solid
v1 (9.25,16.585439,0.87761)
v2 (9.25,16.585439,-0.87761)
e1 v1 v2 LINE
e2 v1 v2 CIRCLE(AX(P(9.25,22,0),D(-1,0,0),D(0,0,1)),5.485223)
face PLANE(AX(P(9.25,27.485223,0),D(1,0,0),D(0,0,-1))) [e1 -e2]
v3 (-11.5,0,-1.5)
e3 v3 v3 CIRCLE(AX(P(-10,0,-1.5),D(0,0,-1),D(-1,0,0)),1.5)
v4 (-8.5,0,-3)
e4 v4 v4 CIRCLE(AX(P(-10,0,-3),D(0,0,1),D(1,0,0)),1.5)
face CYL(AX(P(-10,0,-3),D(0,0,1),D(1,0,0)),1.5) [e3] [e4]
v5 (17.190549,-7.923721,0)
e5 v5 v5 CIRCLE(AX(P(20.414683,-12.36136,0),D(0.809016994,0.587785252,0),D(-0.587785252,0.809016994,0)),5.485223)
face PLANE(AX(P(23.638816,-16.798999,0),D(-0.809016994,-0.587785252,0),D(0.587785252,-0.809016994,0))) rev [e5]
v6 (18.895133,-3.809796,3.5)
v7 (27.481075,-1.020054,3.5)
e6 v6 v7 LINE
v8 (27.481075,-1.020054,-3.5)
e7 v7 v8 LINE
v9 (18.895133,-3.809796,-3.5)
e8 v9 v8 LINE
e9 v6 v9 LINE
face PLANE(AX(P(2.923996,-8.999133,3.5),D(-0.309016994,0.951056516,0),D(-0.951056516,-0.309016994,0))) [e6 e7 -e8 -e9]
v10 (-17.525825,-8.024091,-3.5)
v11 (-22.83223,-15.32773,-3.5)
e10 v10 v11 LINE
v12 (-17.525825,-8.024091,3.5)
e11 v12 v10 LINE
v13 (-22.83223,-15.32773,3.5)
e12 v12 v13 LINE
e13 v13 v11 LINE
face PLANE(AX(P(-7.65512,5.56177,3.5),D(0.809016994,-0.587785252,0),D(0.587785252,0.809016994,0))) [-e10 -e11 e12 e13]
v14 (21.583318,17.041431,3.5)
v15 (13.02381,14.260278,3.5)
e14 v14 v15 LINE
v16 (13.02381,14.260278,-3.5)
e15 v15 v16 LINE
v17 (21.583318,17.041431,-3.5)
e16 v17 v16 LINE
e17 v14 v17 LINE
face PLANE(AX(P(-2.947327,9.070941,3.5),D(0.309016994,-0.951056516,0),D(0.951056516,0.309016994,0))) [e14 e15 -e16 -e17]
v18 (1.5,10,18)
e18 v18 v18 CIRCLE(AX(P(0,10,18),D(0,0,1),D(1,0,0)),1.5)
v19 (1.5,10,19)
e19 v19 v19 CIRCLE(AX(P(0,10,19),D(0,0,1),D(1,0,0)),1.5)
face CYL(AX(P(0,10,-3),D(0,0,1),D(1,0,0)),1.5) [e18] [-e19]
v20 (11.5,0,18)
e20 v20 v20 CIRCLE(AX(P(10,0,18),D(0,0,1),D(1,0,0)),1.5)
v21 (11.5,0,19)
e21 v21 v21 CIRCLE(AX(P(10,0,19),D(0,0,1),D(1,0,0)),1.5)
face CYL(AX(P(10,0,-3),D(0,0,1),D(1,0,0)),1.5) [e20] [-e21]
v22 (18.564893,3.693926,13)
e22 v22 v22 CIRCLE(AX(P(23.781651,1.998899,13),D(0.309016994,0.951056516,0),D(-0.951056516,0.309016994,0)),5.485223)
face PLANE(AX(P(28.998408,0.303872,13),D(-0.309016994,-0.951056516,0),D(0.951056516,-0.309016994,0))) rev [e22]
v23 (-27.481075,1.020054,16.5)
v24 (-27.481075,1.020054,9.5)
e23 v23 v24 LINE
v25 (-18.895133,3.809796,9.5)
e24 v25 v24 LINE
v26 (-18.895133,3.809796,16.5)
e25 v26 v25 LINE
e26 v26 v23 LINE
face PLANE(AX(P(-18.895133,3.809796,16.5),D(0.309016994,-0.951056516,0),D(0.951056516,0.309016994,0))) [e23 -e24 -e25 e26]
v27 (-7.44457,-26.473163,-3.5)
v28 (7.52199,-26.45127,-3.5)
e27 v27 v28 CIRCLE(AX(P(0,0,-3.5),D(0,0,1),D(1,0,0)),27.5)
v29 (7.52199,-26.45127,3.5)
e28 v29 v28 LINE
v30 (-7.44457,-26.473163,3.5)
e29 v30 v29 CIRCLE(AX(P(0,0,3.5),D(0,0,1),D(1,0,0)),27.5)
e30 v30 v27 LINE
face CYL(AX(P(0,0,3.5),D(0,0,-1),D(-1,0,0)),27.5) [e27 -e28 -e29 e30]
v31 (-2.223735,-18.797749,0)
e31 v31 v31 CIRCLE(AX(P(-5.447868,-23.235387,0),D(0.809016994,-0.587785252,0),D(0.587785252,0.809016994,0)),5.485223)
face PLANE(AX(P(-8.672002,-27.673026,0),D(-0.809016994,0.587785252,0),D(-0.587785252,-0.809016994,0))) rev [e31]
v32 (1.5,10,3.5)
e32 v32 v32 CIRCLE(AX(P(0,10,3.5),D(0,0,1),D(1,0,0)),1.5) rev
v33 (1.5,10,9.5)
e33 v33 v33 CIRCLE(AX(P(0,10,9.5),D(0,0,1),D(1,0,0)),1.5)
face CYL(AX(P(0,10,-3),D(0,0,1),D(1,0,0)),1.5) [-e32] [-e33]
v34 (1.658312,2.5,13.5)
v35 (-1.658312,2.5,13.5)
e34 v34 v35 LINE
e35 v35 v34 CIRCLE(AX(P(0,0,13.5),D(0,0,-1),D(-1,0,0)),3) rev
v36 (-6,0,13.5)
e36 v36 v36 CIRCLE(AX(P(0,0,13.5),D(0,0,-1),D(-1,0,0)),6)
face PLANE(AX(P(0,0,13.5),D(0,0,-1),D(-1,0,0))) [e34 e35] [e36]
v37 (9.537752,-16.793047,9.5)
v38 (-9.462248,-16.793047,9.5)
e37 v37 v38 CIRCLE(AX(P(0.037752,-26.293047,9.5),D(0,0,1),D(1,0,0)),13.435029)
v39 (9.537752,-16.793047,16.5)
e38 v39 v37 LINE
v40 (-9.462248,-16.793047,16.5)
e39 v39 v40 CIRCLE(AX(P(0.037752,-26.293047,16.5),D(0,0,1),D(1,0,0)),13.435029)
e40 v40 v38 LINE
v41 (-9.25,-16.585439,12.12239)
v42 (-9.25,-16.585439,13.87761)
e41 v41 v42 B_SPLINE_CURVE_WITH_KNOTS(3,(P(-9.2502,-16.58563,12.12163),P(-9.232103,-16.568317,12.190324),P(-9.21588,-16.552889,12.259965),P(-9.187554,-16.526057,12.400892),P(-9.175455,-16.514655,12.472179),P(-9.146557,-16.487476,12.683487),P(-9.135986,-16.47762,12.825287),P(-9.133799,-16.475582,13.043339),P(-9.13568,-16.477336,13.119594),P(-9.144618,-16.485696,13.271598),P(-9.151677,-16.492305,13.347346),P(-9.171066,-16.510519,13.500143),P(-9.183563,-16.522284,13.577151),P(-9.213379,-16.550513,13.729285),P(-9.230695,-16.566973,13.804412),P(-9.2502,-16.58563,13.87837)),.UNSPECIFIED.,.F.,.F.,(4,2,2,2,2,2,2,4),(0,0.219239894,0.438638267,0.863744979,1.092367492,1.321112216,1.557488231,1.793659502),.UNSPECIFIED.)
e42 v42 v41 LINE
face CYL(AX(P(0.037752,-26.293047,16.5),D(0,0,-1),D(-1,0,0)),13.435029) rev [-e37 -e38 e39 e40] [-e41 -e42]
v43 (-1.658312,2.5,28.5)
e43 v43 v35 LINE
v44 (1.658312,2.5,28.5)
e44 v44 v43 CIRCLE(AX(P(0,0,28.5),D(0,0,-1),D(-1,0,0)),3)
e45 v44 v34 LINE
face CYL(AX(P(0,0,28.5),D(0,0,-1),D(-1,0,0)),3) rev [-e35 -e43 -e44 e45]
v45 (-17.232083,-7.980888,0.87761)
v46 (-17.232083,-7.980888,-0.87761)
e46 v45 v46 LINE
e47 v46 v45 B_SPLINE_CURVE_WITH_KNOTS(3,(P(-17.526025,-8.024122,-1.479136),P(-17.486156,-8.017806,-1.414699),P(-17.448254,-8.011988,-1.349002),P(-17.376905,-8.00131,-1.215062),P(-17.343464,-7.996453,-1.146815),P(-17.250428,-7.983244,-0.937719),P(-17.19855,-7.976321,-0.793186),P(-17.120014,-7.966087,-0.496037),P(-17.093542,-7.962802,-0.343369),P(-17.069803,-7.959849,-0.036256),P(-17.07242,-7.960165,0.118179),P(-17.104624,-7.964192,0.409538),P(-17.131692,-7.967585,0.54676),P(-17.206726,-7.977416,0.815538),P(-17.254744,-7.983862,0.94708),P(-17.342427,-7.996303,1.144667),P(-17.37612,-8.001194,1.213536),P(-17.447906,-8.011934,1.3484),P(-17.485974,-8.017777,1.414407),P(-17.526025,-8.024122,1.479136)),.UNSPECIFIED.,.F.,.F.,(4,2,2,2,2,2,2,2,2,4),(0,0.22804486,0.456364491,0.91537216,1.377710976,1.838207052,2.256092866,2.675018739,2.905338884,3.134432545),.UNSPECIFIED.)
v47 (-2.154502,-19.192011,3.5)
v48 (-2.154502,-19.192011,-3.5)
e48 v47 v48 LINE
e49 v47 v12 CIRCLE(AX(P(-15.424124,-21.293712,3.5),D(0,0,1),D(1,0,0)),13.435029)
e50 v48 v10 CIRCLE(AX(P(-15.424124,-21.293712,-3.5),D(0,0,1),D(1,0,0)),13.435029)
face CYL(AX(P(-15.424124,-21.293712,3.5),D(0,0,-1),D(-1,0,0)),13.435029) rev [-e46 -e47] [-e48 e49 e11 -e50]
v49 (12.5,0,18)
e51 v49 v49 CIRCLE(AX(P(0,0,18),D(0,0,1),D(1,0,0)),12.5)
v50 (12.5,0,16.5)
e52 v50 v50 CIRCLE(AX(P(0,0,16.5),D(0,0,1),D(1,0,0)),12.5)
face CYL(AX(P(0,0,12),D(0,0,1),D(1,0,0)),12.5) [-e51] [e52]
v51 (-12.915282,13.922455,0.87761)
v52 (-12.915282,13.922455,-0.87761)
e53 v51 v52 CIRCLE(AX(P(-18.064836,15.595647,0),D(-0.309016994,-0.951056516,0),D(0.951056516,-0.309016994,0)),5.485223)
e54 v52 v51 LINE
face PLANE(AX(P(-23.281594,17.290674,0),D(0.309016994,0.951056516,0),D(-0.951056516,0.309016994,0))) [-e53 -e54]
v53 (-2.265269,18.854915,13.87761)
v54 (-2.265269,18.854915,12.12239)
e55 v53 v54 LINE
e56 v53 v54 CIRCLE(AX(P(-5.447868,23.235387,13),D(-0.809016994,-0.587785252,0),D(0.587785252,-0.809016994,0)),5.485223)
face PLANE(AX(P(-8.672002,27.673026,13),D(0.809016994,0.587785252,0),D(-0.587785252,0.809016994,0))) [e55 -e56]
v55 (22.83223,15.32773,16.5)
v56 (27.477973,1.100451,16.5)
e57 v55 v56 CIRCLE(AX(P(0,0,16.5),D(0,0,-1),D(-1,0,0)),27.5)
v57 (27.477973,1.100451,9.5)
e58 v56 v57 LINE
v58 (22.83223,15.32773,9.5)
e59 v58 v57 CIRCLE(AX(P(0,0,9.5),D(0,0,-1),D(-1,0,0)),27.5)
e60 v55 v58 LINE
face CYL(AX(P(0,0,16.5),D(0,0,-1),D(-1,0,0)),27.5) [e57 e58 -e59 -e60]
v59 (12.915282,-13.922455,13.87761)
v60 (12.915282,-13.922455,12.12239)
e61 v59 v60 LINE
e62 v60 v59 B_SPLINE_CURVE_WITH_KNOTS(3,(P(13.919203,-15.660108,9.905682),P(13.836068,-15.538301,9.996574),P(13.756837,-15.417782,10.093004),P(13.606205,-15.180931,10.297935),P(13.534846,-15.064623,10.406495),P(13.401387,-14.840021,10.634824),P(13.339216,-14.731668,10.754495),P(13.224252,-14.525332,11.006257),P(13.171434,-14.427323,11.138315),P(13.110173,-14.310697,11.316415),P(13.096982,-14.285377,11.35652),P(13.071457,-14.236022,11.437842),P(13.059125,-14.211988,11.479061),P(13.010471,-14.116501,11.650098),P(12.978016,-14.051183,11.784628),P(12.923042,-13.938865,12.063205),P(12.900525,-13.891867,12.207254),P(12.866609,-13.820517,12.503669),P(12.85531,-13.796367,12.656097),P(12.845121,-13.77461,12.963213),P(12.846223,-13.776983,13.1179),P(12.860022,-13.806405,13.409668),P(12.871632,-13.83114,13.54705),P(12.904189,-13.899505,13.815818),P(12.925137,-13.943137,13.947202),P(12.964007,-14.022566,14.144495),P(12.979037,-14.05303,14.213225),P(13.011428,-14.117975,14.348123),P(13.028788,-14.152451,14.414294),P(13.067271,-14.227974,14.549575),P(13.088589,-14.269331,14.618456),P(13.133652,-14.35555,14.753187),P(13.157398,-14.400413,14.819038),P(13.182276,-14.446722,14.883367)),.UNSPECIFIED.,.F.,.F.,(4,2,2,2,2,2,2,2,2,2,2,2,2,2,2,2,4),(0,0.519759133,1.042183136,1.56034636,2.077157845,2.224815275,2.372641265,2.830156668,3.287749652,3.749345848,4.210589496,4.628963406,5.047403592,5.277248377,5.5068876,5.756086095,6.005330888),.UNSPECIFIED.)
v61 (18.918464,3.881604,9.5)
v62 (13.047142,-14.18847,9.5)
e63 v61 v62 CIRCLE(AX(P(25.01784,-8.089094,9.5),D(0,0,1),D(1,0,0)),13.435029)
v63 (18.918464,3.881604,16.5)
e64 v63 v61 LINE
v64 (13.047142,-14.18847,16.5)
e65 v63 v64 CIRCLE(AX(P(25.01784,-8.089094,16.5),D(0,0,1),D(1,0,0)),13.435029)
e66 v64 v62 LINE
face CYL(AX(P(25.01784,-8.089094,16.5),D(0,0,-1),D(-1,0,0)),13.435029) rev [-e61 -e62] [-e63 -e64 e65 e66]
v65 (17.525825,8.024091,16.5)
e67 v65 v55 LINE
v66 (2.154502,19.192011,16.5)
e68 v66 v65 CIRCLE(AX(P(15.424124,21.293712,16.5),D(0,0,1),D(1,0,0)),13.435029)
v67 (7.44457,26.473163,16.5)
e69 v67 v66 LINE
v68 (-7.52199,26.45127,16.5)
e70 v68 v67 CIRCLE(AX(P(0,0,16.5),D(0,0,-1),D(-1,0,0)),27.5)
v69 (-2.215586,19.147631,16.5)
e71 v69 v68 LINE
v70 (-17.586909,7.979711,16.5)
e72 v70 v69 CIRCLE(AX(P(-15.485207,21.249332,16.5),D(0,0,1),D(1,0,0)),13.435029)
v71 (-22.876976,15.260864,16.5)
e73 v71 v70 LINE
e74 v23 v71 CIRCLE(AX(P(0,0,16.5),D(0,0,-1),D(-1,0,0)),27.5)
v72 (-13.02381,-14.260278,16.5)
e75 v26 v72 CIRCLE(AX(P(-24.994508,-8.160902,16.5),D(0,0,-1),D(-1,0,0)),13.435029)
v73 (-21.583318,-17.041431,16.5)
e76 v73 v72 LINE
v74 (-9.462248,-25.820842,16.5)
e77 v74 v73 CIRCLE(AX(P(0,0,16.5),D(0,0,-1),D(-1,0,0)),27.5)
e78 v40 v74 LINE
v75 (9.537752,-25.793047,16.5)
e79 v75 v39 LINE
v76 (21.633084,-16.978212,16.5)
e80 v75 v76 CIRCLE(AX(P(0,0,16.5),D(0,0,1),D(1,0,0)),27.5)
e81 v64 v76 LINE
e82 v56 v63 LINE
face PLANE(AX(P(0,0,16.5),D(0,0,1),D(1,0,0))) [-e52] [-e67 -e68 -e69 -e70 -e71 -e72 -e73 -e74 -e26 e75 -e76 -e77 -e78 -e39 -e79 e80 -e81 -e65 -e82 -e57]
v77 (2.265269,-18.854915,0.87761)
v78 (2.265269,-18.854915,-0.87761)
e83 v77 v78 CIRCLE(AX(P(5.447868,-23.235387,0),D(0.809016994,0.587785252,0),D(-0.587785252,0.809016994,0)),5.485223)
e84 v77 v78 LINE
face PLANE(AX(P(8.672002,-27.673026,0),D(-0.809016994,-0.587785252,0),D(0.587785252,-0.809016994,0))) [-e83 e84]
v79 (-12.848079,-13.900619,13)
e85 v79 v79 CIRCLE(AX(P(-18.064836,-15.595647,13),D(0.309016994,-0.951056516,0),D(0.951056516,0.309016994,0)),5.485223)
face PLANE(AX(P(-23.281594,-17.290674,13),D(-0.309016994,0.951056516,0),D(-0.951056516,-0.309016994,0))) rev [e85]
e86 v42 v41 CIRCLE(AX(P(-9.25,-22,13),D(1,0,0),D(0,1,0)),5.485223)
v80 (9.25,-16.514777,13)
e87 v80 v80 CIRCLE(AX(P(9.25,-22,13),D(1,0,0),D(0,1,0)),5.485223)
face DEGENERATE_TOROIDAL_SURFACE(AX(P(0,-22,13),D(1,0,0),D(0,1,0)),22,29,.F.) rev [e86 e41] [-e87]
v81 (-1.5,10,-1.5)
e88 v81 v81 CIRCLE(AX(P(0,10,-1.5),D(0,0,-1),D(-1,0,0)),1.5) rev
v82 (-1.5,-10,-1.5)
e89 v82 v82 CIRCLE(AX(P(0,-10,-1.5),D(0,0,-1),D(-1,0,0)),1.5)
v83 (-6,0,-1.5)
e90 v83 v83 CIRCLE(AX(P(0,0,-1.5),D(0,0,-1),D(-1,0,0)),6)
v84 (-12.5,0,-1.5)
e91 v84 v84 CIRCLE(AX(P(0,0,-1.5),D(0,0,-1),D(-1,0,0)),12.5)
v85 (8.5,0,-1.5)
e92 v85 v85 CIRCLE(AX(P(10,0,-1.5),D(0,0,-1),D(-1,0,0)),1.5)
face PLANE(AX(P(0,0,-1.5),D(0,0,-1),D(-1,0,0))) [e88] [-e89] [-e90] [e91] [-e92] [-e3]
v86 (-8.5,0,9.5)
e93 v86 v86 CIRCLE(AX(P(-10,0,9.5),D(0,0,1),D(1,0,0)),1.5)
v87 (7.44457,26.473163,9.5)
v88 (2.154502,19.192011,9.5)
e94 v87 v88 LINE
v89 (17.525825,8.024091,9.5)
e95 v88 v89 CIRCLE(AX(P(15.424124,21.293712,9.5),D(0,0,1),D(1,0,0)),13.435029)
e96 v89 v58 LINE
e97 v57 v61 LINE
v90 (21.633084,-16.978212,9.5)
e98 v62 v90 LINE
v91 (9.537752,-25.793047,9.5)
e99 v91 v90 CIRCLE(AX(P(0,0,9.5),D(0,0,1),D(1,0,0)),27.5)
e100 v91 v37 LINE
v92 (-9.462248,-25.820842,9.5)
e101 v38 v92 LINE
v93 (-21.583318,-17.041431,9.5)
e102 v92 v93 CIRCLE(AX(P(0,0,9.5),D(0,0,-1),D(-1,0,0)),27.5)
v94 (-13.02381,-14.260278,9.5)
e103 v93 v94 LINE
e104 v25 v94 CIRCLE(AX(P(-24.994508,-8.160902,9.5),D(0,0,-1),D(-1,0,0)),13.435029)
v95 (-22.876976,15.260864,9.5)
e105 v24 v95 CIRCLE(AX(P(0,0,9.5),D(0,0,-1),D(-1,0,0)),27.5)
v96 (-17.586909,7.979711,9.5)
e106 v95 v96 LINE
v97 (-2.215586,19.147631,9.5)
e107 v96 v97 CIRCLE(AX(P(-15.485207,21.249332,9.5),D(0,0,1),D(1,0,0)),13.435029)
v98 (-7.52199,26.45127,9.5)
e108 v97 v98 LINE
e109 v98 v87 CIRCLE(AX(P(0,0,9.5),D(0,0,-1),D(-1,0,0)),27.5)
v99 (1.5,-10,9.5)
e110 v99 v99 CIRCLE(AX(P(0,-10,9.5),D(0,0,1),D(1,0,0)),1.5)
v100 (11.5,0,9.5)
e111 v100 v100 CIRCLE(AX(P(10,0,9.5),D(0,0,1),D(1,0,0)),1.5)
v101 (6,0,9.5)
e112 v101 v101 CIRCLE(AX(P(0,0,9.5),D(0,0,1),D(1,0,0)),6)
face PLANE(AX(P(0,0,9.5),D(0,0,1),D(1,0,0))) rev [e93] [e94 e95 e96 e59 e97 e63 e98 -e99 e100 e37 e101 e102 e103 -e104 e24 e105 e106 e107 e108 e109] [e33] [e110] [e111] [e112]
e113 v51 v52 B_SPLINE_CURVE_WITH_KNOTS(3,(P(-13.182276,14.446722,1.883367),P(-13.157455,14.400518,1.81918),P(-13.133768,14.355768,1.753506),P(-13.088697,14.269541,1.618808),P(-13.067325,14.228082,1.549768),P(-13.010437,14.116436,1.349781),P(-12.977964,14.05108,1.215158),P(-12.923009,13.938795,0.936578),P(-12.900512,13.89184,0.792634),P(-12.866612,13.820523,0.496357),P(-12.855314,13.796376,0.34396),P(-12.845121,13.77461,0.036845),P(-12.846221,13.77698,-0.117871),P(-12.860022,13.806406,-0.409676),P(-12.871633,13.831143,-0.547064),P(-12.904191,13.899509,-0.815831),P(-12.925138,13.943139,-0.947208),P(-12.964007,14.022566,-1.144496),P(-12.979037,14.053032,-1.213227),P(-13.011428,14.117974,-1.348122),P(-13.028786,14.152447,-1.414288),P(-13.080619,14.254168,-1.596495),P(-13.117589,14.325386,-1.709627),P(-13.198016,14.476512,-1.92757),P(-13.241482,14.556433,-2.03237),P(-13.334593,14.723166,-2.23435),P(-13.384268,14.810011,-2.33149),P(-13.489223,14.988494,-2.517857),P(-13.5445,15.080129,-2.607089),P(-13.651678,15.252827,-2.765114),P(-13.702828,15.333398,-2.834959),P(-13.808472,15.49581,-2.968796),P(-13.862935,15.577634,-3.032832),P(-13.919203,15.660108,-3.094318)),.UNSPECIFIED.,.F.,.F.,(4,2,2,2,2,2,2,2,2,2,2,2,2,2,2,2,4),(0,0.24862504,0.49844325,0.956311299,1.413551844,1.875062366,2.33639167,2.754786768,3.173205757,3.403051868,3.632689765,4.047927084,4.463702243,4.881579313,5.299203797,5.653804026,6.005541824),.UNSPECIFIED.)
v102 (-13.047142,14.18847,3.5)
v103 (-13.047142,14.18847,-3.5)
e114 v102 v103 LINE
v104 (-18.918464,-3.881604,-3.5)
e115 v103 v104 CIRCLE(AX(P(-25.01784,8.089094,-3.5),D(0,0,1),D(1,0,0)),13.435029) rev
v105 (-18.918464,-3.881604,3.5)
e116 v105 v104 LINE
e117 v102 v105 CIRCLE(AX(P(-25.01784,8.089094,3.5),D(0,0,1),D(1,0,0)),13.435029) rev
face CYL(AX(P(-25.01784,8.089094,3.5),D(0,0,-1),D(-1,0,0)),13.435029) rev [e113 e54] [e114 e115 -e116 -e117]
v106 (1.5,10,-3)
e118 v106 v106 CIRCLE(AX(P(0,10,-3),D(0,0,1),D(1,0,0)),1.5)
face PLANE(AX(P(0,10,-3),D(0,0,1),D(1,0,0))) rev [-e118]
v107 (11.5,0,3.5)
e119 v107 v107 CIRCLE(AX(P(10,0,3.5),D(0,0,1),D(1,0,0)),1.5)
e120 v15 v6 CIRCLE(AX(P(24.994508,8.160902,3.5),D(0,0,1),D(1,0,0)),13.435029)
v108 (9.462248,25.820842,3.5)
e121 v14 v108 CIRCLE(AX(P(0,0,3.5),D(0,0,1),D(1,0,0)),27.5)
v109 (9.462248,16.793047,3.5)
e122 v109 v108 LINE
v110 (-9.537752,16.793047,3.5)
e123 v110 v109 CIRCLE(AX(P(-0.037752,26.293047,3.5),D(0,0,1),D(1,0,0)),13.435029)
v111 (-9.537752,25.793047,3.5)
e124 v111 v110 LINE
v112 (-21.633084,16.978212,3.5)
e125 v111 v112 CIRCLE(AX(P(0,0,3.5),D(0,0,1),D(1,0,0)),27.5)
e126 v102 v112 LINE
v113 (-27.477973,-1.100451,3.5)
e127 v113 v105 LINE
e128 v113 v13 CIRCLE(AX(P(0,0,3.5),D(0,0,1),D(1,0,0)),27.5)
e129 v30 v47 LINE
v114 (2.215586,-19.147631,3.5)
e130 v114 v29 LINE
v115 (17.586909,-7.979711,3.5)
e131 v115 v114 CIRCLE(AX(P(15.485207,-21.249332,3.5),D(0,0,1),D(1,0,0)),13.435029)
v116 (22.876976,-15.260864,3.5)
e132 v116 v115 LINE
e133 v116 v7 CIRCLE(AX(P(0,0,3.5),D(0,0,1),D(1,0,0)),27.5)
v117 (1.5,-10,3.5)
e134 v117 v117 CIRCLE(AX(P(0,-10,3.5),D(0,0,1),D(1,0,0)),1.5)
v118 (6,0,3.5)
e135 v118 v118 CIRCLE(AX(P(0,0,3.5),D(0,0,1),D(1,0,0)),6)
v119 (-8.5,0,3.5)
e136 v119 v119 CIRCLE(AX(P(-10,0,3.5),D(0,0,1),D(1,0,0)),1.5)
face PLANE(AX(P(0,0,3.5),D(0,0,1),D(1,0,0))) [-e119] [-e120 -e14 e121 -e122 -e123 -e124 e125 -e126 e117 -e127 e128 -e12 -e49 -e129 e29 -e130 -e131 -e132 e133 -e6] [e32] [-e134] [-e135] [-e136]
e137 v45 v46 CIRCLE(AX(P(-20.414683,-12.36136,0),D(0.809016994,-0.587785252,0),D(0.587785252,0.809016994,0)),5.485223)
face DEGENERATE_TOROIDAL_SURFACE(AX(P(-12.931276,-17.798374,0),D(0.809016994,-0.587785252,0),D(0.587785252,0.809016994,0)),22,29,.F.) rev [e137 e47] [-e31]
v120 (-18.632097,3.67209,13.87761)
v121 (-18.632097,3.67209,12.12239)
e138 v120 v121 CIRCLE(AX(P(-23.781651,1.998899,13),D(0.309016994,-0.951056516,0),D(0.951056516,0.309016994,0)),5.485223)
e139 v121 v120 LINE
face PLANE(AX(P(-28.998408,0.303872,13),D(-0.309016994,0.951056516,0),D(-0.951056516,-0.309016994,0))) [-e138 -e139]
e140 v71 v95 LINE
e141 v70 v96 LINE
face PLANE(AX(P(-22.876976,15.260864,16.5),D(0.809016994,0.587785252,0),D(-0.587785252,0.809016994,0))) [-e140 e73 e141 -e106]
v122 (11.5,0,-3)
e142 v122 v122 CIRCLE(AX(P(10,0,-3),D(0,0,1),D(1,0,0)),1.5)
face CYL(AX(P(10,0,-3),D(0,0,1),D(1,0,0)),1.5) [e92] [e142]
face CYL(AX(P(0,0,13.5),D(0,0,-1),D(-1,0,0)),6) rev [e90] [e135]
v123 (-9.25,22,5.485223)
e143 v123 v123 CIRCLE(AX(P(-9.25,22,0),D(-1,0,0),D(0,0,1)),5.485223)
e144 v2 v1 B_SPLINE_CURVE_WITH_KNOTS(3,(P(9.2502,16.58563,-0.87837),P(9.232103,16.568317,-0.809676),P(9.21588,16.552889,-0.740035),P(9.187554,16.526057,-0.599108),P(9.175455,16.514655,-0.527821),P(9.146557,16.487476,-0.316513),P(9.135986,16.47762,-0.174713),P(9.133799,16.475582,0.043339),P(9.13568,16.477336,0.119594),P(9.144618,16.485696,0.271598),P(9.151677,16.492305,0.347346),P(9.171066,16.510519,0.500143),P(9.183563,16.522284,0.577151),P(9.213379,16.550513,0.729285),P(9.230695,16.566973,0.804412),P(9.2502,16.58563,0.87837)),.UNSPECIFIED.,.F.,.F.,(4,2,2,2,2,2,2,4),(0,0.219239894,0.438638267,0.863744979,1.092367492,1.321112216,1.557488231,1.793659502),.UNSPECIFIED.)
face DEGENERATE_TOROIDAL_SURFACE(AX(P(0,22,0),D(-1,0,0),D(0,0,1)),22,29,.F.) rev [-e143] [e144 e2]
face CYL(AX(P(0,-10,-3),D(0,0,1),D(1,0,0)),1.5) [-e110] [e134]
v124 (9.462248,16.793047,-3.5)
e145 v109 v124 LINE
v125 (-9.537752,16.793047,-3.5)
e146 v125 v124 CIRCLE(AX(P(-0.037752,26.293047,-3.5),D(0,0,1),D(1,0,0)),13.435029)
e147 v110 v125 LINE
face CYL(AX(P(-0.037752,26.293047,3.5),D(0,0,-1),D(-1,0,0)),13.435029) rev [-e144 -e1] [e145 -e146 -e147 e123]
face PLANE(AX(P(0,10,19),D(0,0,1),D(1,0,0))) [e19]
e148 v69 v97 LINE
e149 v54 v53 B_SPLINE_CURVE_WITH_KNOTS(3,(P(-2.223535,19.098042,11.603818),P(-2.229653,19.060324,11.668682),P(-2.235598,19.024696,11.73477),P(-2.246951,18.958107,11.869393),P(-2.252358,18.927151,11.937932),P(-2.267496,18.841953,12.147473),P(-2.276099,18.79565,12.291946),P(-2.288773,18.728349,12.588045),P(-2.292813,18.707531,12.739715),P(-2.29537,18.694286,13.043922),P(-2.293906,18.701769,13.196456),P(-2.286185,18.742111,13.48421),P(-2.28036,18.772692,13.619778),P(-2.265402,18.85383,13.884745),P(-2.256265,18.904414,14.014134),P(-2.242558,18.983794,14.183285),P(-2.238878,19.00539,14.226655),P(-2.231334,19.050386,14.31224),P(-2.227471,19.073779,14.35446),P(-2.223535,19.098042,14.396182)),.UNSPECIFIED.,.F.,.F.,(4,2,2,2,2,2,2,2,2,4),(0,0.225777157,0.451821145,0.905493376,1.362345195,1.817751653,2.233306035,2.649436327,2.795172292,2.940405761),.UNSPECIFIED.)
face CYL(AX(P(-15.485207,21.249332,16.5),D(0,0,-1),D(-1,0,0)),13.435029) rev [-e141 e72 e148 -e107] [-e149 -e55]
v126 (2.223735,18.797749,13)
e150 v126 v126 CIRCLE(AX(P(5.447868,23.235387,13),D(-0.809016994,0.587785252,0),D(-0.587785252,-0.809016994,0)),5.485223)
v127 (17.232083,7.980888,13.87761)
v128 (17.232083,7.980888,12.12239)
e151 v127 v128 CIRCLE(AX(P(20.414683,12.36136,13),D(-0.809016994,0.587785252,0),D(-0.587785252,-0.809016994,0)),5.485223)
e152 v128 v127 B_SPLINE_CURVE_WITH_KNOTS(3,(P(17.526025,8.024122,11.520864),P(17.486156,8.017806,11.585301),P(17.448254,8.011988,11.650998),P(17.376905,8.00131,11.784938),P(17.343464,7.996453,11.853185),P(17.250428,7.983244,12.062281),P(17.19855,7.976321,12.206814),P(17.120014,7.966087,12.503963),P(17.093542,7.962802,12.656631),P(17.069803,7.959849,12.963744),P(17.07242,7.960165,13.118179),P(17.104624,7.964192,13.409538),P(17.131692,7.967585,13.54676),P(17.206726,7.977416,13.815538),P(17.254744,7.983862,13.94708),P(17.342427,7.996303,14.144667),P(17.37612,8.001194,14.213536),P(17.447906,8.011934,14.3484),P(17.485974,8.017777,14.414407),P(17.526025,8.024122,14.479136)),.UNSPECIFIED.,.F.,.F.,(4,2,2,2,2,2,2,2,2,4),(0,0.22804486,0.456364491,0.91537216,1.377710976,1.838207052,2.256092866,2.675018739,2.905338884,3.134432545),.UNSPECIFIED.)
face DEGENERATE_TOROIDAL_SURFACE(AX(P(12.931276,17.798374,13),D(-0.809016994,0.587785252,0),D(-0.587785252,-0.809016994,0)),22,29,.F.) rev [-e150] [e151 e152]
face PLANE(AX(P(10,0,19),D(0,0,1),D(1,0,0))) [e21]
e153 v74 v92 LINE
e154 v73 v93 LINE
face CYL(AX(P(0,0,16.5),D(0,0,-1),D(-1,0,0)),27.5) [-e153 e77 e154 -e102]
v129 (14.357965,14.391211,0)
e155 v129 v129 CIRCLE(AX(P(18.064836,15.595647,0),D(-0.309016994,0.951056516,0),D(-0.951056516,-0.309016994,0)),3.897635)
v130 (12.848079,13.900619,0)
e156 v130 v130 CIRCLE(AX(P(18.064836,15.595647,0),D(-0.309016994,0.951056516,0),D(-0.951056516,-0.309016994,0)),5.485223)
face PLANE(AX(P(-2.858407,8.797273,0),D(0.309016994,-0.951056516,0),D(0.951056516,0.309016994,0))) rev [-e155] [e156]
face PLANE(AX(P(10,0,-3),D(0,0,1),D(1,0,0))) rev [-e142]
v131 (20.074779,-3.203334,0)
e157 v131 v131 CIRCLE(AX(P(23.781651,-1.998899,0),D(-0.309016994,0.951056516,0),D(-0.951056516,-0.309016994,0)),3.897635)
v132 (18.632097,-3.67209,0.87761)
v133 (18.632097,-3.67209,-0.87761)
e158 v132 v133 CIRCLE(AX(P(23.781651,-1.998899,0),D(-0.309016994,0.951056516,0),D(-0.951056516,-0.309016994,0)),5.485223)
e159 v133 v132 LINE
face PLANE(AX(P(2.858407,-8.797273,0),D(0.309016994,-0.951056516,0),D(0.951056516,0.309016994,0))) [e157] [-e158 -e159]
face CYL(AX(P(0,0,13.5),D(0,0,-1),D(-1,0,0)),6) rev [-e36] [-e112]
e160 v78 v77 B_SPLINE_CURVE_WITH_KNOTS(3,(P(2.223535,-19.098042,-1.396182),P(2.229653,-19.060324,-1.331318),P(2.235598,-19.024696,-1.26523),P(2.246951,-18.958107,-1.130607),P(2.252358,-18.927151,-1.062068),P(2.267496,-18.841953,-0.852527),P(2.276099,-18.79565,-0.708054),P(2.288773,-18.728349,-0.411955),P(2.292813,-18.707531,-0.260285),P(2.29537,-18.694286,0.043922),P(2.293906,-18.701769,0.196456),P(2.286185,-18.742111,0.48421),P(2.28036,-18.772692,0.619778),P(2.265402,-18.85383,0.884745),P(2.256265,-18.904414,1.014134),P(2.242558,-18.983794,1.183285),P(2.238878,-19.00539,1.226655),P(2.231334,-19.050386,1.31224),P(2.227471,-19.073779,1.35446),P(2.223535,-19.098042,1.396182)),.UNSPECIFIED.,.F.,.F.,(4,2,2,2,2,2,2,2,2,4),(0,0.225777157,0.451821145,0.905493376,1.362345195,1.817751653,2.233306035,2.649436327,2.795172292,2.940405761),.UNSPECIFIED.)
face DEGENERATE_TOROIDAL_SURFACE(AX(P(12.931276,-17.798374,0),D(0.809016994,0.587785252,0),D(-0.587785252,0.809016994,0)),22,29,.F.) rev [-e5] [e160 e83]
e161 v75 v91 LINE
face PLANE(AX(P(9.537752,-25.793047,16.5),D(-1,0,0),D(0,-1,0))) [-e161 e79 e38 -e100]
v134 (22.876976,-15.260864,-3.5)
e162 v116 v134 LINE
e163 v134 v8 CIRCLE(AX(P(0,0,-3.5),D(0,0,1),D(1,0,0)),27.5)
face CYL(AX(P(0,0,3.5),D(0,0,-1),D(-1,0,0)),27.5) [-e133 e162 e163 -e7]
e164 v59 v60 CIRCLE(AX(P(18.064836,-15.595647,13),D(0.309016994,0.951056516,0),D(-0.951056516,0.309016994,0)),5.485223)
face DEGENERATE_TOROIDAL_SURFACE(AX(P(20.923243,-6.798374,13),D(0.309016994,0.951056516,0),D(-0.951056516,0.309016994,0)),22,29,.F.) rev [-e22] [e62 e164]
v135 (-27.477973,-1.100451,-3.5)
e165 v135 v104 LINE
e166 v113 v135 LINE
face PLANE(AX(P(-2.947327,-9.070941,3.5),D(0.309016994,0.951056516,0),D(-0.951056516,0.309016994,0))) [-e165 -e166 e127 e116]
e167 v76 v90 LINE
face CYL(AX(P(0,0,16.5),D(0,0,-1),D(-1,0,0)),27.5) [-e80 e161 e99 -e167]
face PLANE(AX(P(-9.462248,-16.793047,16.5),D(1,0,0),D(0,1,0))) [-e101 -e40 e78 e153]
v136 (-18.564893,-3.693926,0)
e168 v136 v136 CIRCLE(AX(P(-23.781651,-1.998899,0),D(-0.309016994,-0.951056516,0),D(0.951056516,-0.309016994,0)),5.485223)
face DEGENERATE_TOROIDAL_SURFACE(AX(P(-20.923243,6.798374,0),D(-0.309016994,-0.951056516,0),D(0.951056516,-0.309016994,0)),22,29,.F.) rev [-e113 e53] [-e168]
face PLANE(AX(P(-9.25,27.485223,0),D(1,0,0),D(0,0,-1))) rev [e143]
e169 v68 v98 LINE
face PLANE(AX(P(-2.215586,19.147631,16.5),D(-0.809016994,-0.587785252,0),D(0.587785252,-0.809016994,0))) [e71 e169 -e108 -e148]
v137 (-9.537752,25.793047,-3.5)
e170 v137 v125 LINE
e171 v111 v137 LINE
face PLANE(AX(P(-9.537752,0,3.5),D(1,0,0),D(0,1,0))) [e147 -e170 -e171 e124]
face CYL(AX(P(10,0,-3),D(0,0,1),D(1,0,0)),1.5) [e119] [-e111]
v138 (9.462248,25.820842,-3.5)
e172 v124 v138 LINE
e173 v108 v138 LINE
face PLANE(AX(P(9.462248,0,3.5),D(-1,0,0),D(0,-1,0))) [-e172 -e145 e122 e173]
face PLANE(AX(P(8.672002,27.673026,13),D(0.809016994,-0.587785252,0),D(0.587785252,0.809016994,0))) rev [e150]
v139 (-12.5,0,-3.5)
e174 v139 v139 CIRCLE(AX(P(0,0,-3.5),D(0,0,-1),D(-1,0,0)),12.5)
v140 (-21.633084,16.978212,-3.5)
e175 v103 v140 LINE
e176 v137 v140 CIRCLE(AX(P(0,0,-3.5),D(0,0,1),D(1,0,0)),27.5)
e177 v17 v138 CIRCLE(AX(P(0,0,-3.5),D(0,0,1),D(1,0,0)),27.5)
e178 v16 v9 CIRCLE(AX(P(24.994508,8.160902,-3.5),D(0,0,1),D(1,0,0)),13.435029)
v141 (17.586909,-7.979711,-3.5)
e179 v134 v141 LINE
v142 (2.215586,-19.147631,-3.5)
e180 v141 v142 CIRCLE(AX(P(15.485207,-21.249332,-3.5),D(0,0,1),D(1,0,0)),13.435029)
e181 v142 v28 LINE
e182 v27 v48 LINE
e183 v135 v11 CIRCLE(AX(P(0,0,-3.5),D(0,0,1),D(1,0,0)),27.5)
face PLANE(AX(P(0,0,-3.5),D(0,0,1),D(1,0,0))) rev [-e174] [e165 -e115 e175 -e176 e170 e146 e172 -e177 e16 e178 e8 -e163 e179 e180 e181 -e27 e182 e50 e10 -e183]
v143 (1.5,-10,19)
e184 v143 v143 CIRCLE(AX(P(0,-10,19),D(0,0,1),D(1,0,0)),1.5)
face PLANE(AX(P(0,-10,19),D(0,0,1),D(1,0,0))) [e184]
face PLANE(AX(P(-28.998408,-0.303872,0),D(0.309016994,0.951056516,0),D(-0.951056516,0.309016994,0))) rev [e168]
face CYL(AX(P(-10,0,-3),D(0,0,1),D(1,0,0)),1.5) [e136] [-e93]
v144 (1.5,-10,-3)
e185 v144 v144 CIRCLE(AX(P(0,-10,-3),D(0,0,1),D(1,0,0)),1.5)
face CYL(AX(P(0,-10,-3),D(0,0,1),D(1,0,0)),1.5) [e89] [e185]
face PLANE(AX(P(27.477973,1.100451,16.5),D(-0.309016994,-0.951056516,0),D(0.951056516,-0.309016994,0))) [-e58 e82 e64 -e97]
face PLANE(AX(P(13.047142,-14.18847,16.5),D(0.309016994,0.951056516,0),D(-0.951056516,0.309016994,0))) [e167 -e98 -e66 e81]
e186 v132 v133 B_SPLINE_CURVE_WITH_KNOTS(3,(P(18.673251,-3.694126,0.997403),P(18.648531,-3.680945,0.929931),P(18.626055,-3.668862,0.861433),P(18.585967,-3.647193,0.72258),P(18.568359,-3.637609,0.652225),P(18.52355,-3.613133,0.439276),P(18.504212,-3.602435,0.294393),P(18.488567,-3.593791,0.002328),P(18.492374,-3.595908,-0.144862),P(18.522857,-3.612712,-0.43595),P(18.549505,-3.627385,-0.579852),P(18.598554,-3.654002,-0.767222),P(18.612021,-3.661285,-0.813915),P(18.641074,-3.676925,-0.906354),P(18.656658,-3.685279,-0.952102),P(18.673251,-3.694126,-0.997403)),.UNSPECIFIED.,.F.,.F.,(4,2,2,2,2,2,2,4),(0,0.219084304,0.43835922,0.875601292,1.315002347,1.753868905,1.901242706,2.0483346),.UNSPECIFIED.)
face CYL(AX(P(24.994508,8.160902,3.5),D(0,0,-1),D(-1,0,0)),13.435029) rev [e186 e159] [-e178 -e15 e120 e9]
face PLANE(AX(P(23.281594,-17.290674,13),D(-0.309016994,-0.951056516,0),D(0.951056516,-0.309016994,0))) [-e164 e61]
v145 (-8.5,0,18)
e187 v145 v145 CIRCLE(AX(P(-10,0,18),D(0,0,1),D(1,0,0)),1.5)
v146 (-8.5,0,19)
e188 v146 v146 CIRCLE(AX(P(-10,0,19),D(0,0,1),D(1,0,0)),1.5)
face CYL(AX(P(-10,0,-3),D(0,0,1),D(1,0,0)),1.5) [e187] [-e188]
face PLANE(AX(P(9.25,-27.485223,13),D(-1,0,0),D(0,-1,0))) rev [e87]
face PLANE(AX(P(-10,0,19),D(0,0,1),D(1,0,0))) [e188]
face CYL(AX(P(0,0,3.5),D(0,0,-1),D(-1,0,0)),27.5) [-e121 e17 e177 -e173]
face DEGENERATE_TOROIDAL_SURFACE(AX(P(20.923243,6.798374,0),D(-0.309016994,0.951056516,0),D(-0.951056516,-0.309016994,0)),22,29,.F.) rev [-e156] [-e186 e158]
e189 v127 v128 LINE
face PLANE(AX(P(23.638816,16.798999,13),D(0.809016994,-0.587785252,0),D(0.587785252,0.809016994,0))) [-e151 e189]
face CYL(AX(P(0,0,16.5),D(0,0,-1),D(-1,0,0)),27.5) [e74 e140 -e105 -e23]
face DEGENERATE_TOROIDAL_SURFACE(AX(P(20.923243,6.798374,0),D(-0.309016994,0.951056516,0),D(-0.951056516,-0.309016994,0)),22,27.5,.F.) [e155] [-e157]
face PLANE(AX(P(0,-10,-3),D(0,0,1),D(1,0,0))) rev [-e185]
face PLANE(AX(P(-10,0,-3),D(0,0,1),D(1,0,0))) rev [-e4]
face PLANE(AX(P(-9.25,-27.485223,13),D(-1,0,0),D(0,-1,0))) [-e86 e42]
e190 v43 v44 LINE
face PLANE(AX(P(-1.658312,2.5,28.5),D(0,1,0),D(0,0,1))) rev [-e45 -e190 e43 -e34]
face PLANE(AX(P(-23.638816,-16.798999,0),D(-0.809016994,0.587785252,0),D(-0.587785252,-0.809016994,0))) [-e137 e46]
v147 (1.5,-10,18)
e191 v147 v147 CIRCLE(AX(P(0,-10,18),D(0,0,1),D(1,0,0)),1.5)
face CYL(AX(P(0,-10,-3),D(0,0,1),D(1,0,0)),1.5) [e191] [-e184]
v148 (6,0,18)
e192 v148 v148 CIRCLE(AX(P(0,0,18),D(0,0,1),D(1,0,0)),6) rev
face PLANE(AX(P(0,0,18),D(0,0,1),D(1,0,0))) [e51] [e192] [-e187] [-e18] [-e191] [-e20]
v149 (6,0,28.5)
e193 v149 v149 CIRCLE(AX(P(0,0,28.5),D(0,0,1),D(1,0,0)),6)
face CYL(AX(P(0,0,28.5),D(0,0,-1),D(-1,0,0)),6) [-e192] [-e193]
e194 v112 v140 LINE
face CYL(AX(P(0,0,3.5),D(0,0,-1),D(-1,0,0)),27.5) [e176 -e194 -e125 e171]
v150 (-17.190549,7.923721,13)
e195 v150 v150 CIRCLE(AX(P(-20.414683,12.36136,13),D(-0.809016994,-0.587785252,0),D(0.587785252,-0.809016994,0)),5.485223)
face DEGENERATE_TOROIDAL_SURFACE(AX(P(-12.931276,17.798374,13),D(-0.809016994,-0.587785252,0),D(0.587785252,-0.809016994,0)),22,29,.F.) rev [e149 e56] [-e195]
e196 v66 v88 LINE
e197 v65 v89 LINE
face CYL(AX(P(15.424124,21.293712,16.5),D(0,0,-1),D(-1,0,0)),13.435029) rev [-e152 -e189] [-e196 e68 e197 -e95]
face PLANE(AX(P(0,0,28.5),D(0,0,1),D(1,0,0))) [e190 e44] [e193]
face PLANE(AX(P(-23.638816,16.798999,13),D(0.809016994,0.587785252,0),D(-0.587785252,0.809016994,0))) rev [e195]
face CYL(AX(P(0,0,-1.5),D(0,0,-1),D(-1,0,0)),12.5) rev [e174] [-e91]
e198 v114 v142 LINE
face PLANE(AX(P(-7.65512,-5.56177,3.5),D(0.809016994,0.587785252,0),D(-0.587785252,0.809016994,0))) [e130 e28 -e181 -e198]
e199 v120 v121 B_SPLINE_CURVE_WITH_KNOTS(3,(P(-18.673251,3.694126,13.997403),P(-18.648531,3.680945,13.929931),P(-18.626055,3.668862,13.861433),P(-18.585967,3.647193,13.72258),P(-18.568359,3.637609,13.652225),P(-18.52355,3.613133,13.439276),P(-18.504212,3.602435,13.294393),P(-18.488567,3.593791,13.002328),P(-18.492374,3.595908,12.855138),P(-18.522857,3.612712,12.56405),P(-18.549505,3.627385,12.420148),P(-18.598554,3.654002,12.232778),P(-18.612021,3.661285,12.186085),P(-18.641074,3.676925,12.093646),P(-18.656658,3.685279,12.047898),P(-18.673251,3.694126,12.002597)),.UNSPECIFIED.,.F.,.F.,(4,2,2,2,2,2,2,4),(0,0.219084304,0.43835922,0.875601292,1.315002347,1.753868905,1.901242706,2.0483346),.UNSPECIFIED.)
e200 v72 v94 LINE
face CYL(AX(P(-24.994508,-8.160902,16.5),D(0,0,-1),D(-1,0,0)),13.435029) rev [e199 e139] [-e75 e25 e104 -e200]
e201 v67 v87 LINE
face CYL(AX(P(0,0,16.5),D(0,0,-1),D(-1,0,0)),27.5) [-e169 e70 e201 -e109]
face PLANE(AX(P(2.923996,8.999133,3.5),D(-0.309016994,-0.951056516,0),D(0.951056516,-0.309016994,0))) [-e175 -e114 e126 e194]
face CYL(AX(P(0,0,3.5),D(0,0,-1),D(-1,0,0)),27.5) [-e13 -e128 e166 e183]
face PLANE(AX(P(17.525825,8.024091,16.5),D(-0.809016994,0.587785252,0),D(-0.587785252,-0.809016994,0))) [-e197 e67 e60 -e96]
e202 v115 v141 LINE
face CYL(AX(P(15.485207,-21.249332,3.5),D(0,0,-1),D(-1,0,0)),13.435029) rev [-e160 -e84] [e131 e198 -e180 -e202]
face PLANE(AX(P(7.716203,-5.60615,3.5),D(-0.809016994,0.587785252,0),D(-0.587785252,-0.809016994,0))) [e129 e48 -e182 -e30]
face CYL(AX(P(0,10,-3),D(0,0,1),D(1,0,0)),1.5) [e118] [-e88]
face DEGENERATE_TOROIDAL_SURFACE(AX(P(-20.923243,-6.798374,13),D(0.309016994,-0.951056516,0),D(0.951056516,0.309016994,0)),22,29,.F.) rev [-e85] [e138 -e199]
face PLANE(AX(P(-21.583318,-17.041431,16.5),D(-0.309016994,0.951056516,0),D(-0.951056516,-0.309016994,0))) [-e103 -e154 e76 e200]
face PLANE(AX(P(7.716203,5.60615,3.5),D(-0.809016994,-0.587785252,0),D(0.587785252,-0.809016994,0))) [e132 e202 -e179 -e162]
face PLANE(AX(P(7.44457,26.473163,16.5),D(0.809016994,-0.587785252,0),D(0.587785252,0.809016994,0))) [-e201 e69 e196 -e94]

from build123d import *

# Parameters (mm, degrees)
BOSS_EXTRUDE2_DEPTH      = 3.5
BOSS_EXTRUDE5_DEPTH      = 3.5
BOSS_EXTRUDE6_DEPTH      = 5
BOSS_EXTRUDE6_DEPTH_BACK = 1
SKETCH3_30_R             = 12.5
SKETCH6_R                = 12.5
CUT_EXTRUDE3_DEPTH       = 2
BOSS_EXTRUDE9_DEPTH      = 6
BOSS_EXTRUDE9_DEPTH_BACK = 16
SKETCH3_33_R             = 1.5
SKETCH10_R               = 6
BOSS_EXTRUDE10_DEPTH     = 12
CUT_EXTRUDE4_DEPTH       = 51.813384178
CUT_EXTRUDE4_DEPTH_BACK  = 51.813384178
SKETCH11_R               = 6
CUT_EXTRUDE5_DEPTH       = 15


# Read off the part's stored shape, not the designer's step: moBlkMgr[Onmi_58mm_OK]
with BuildPart() as part:
    # Sketch1 → Revolve3 (revolve)
    with BuildSketch(Plane.XY, mode=Mode.PRIVATE) as revolve3_sk:
        with BuildLine():
            Line((27.488521747, -0.794463438), (28.998407922, -0.303871681))
            ThreePointArc((28.998407922, -0.303871681), (27.580638973, 8.961492837), (23.281593526, 17.29067387))
            Line((23.281593526, 17.29067387), (21.771707351, 16.800082113))
            ThreePointArc((21.771707351, 16.800082113), (26.028560776, 8.874909798), (27.5, 0))
            ThreePointArc((27.5, 0), (27.497130287, -0.397273176), (27.488521747, -0.794463438))
        make_face()
    revolve(revolve3_sk.sketch.rotate(Axis((18.064836163, 15.595646653, 0), (0.30901699437493513, -0.9510565162951576, 0)), 180), axis=Axis((18.064836163, 15.595646653, 0), (0.30901699437493513, -0.9510565162951576, 0)))



with BuildPart() as body_2:
    # Sketch1<6> → Revolve4 (revolve)
    with BuildSketch(Plane.XY, mode=Mode.PRIVATE) as revolve4_sk:
        with BuildLine():
            Line((-9.25, 27.485223303), (-9.25, 22.000000003))
            Line((-9.25, 22.000000003), (9.25, 22.000000003))
            Line((9.25, 22.000000003), (9.25, 27.485223303))
            ThreePointArc((9.25, 27.485223303), (0, 29), (-9.25, 27.485223303))
        make_face()
    revolve(revolve4_sk.sketch.rotate(Axis((-9.25, 22.000000003, 0), (1, 0, 0)), 90), axis=Axis((-9.25, 22.000000003, 0), (1, 0, 0)))


with BuildPart() as body_3:
    # Sketch1<7> → Revolve5 (revolve)
    with BuildSketch(Plane.XY, mode=Mode.PRIVATE) as revolve5_sk:
        with BuildLine():
            Line((-23.281593526, 17.29067387), (-18.064836163, 15.595646653))
            Line((-18.064836163, 15.595646653), (-23.781650559, -1.998898899))
            Line((-23.781650559, -1.998898899), (-28.998407922, -0.303871681))
            ThreePointArc((-28.998407922, -0.303871681), (-27.580638973, 8.961492837), (-23.281593526, 17.29067387))
        make_face()
    revolve(revolve5_sk.sketch.rotate(Axis((-23.781650559, -1.998898899, 0), (0.3090169943749596, 0.9510565162951496, 0)), 180), axis=Axis((-23.781650559, -1.998898899, 0), (0.3090169943749596, 0.9510565162951496, 0)))


with BuildPart() as body_4:
    # Sketch1<8> → Revolve6 (revolve)
    with BuildSketch(Plane.XY, mode=Mode.PRIVATE) as revolve6_sk:
        with BuildLine():
            Line((-23.638816111, -16.798999162), (-20.41468275, -12.361360295))
            Line((-20.41468275, -12.361360295), (-5.447868354, -23.235387462))
            Line((-5.447868354, -23.235387462), (-8.672001715, -27.67302633))
            ThreePointArc((-8.672001715, -27.67302633), (-17.045772316, -23.461492837), (-23.638816111, -16.798999162))
        make_face()
    revolve(revolve6_sk.sketch.rotate(Axis((-5.447868354, -23.235387462, 0), (-0.8090169943749399, 0.5877852522924835, 0)), 180), axis=Axis((-5.447868354, -23.235387462, 0), (-0.8090169943749399, 0.5877852522924835, 0)))


with BuildPart() as body_5:
    # Sketch1<9> → Revolve7 (revolve)
    with BuildSketch(Plane.XY, mode=Mode.PRIVATE) as revolve7_sk:
        with BuildLine():
            Line((8.672001715, -27.67302633), (5.447868354, -23.235387462))
            Line((5.447868354, -23.235387462), (20.41468275, -12.361360295))
            Line((20.41468275, -12.361360295), (23.638816111, -16.798999162))
            ThreePointArc((23.638816111, -16.798999162), (17.045772316, -23.461492837), (8.672001715, -27.67302633))
        make_face()
    revolve(revolve7_sk.sketch.rotate(Axis((20.41468275, -12.361360295, 0), (-0.809016994374955, -0.5877852522924628, 0)), 180), axis=Axis((20.41468275, -12.361360295, 0), (-0.809016994374955, -0.5877852522924628, 0)))


with BuildPart() as part_1:
    add(part.part)

    add(body_2.part)  # Boss-Extrude2 merges body 2

    add(body_3.part)  # Boss-Extrude2 merges body 3

    add(body_4.part)  # Boss-Extrude2 merges body 4

    add(body_5.part)  # Boss-Extrude2 merges body 5
    # Sketch1<10> → Boss-Extrude2 (add, symmetric)
    with BuildSketch(Plane.XY):
        with BuildLine():
            ThreePointArc((22.87697608, -15.26086385), (26.166457463, -8.459698804), (27.48107512, -1.020054043))
            Line((27.48107512, -1.020054043), (18.895132644, -3.809795864))
            ThreePointArc((18.895132644, -3.809795864), (12.217036375, 4.009250255), (13.023809751, 14.260277946))
            Line((13.023809751, 14.260277946), (21.583318397, 17.041430895))
            ThreePointArc((21.583318397, 17.041430895), (16.131531712, 22.271589181), (9.46224828, 25.820841533))
            Line((9.46224828, 25.820841533), (9.46224828, 16.79304736))
            ThreePointArc((9.46224828, 16.79304736), (-0.03775172, 12.858018518), (-9.53775172, 16.79304736))
            Line((-9.53775172, 16.79304736), (-9.53775172, 25.79304736))
            ThreePointArc((-9.53775172, 25.79304736), (-16.196622574, 22.224297901), (-21.633084073, 16.978211728))
            Line((-21.633084073, 16.978211728), (-13.047141597, 14.188469907))
            ThreePointArc((-13.047141597, 14.188469907), (-12.240368221, 3.937442217), (-18.91846449, -3.881603902))
            Line((-18.91846449, -3.881603902), (-27.477973137, -1.100450953))
            ThreePointArc((-27.477973137, -1.100450953), (-26.141594966, -8.536217702), (-22.832229519, -15.327729617))
            Line((-22.832229519, -15.327729617), (-17.525825243, -8.024090709))
            ThreePointArc((-17.525825243, -8.024090709), (-7.527211875, -10.424545399), (-2.15450235, -19.192010503))
            Line((-2.15450235, -19.192010503), (-7.44456962, -26.473163452))
            ThreePointArc((-7.44456962, -26.473163452), (0.040228365, -27.499970576), (7.521990192, -26.451269602))
            Line((7.521990192, -26.451269602), (2.215585916, -19.147630694))
            ThreePointArc((2.215585916, -19.147630694), (7.588295441, -10.380165591), (17.586908809, -7.979710901))
            Line((17.586908809, -7.979710901), (22.87697608, -15.26086385))
        make_face()
    extrude(amount=BOSS_EXTRUDE2_DEPTH, both=True)

    # Sketch6 → Cut-Extrude3 (cut)
    with BuildSketch(Plane(origin=(0, 0, -3.5), x_dir=(-1, 0, 0), z_dir=(0, 0, -1))):
        with Locations(Location((0, 0, 0), (0, 0, 180))):
            Circle(SKETCH6_R)
    extrude(amount=-CUT_EXTRUDE3_DEPTH, mode=Mode.SUBTRACT)



with BuildPart() as body_2_2:
    # Sketch3 → Boss-Extrude5 (new, symmetric)
    with BuildSketch(Plane.XY.offset(13)):
        with BuildLine():
            Line((-22.87697608, 15.26086385), (-17.586908809, 7.979710901))
            ThreePointArc((-17.586908809, 7.979710901), (-7.588295441, 10.380165591), (-2.215585916, 19.147630694))
            Line((-2.215585916, 19.147630694), (-7.521990192, 26.451269602))
            ThreePointArc((-7.521990192, 26.451269602), (-0.040228365, 27.499970576), (7.44456962, 26.473163452))
            Line((7.44456962, 26.473163452), (2.15450235, 19.192010503))
            ThreePointArc((2.15450235, 19.192010503), (7.527211875, 10.424545399), (17.525825243, 8.024090709))
            Line((17.525825243, 8.024090709), (22.832229519, 15.327729617))
            ThreePointArc((22.832229519, 15.327729617), (26.141594966, 8.536217702), (27.477973137, 1.100450953))
            Line((27.477973137, 1.100450953), (18.91846449, 3.881603902))
            ThreePointArc((18.91846449, 3.881603902), (12.240368221, -3.937442217), (13.047141597, -14.188469907))
            Line((13.047141597, -14.188469907), (21.633084073, -16.978211728))
            ThreePointArc((21.633084073, -16.978211728), (16.196622574, -22.224297901), (9.53775172, -25.79304736))
            Line((9.53775172, -25.79304736), (9.53775172, -16.79304736))
            ThreePointArc((9.53775172, -16.79304736), (0.03775172, -12.858018518), (-9.46224828, -16.79304736))
            Line((-9.46224828, -16.79304736), (-9.46224828, -25.820841533))
            ThreePointArc((-9.46224828, -25.820841533), (-16.131531712, -22.271589181), (-21.583318397, -17.041430895))
            Line((-21.583318397, -17.041430895), (-13.023809751, -14.260277946))
            ThreePointArc((-13.023809751, -14.260277946), (-12.217036375, -4.009250255), (-18.895132644, 3.809795864))
            Line((-18.895132644, 3.809795864), (-27.48107512, 1.020054043))
            ThreePointArc((-27.48107512, 1.020054043), (-26.166457463, 8.459698804), (-22.87697608, 15.26086385))
        make_face()
    extrude(amount=BOSS_EXTRUDE5_DEPTH, both=True)

    # Sketch3<25> → Revolve14 (revolve)
    with BuildSketch(Plane.XY.offset(13), mode=Mode.PRIVATE) as revolve14_sk:
        with BuildLine():
            Line((23.638816111, 16.798999162), (20.41468275, 12.361360295))
            Line((20.41468275, 12.361360295), (5.447868354, 23.235387462))
            Line((5.447868354, 23.235387462), (8.672001715, 27.67302633))
            ThreePointArc((8.672001715, 27.67302633), (17.045772316, 23.461492837), (23.638816111, 16.798999162))
        make_face()
    revolve(revolve14_sk.sketch.rotate(Axis((5.447868354, 23.235387462, 13), (0.80901699437494, -0.5877852522924834, 0)), 170.793375583), axis=Axis((5.447868354, 23.235387462, 13), (0.80901699437494, -0.5877852522924834, 0)))

    # Sketch3<26> → Revolve15 (revolve)
    with BuildSketch(Plane.XY.offset(13), mode=Mode.PRIVATE) as revolve15_sk:
        with BuildLine():
            Line((23.281593526, -17.29067387), (18.064836163, -15.595646653))
            Line((18.064836163, -15.595646653), (23.781650559, 1.998898899))
            Line((23.781650559, 1.998898899), (28.998407922, 0.303871681))
            ThreePointArc((28.998407922, 0.303871681), (27.580638973, -8.961492837), (23.281593526, -17.29067387))
        make_face()
    revolve(revolve15_sk.sketch.rotate(Axis((23.781650559, 1.998898899, 13), (-0.3090169943749462, -0.951056516295154, 0)), 170.793375583), axis=Axis((23.781650559, 1.998898899, 13), (-0.3090169943749462, -0.951056516295154, 0)))

    # Sketch3<27> → Revolve16 (revolve)
    with BuildSketch(Plane.XY.offset(13), mode=Mode.PRIVATE) as revolve16_sk:
        with BuildLine():
            Line((-23.638816111, 16.798999162), (-20.41468275, 12.361360295))
            Line((-20.41468275, 12.361360295), (-5.447868354, 23.235387462))
            Line((-5.447868354, 23.235387462), (-8.672001715, 27.67302633))
            ThreePointArc((-8.672001715, 27.67302633), (-17.045772316, 23.461492837), (-23.638816111, 16.798999162))
        make_face()
    revolve(revolve16_sk.sketch.rotate(Axis((-20.41468275, 12.361360295, 13), (0.8090169943749468, 0.5877852522924741, 0)), 170.793375583), axis=Axis((-20.41468275, 12.361360295, 13), (0.8090169943749468, 0.5877852522924741, 0)))

    # Sketch3<28> → Revolve17 (revolve)
    with BuildSketch(Plane.XY.offset(13), mode=Mode.PRIVATE) as revolve17_sk:
        with BuildLine():
            Line((-28.998407922, 0.303871681), (-23.781650559, 1.998898899))
            Line((-23.781650559, 1.998898899), (-18.064836163, -15.595646653))
            Line((-18.064836163, -15.595646653), (-23.281593526, -17.29067387))
            ThreePointArc((-23.281593526, -17.29067387), (-27.580638973, -8.961492837), (-28.998407922, 0.303871681))
        make_face()
    revolve(revolve17_sk.sketch.rotate(Axis((-18.064836163, -15.595646653, 13), (-0.3090169943749486, 0.9510565162951532, 0)), 170.793375583), axis=Axis((-18.064836163, -15.595646653, 13), (-0.3090169943749486, 0.9510565162951532, 0)))

    # Sketch3<29> → Revolve18 (revolve)
    with BuildSketch(Plane.XY.offset(13), mode=Mode.PRIVATE) as revolve18_sk:
        with BuildLine():
            Line((-9.25, -27.485223303), (-9.25, -22.000000003))
            Line((-9.25, -22.000000003), (9.25, -22.000000003))
            Line((9.25, -22.000000003), (9.25, -27.485223303))
            ThreePointArc((9.25, -27.485223303), (0, -29), (-9.25, -27.485223303))
        make_face()
    revolve(revolve18_sk.sketch.rotate(Axis((9.25, -22.000000003, 13), (-1, 0, 0)), 189.206624435), axis=Axis((9.25, -22.000000003, 13), (-1, 0, 0)))

    # Sketch3<30> → Boss-Extrude6 (add, two sides: drawn at the far end of the back side and taken through both)
    with BuildSketch(Plane.XY.offset(13).offset(-BOSS_EXTRUDE6_DEPTH_BACK)):
        Circle(SKETCH3_30_R)
    extrude(amount=BOSS_EXTRUDE6_DEPTH + BOSS_EXTRUDE6_DEPTH_BACK)


with BuildPart() as part_2:
    add(part_1.part)

    add(body_2_2.part)  # Boss-Extrude9 merges body 2 2
    # Sketch3<33> → Boss-Extrude9 (add, two sides: drawn at the far end of the back side and taken through both)
    with BuildSketch(Plane.XY.offset(13).offset(-BOSS_EXTRUDE9_DEPTH_BACK)):
        with Locations((0, 10)):
            Circle(SKETCH3_33_R)
        with Locations((10, 0)):
            Circle(SKETCH3_33_R)
        with Locations((0, -10)):
            Circle(SKETCH3_33_R)
        with Locations((-10, 0)):
            Circle(SKETCH3_33_R)
    extrude(amount=BOSS_EXTRUDE9_DEPTH + BOSS_EXTRUDE9_DEPTH_BACK)

    # Sketch10 → Boss-Extrude10 (add)
    with BuildSketch(Plane.XY.offset(16.5)):
        Circle(SKETCH10_R)
    extrude(amount=BOSS_EXTRUDE10_DEPTH)

    # Sketch9 → Cut-Extrude4 (cut, two sides: drawn at the far end of the back side and taken through both)
    with BuildSketch(Plane(origin=(0, 0, -1.5), x_dir=(-1, 0, 0), z_dir=(0, 0, -1)).offset(-CUT_EXTRUDE4_DEPTH_BACK)):
        with BuildLine():
            Line((1.658312395, 2.5), (-1.658312395, 2.5))
            ThreePointArc((-1.658312395, 2.5), (0, -3), (1.658312395, 2.5))
        make_face()
    extrude(amount=CUT_EXTRUDE4_DEPTH + CUT_EXTRUDE4_DEPTH_BACK, mode=Mode.SUBTRACT)

    # Sketch11 → Cut-Extrude5 (cut)
    with BuildSketch(Plane(origin=(0, 0, -1.5), x_dir=(-1, 0, 0), z_dir=(0, 0, -1))):
        with Locations(Location((0, 0, 0), (0, 0, 180))):
            Circle(SKETCH11_R)
    extrude(amount=-CUT_EXTRUDE5_DEPTH, mode=Mode.SUBTRACT)


solid = part_2.part
